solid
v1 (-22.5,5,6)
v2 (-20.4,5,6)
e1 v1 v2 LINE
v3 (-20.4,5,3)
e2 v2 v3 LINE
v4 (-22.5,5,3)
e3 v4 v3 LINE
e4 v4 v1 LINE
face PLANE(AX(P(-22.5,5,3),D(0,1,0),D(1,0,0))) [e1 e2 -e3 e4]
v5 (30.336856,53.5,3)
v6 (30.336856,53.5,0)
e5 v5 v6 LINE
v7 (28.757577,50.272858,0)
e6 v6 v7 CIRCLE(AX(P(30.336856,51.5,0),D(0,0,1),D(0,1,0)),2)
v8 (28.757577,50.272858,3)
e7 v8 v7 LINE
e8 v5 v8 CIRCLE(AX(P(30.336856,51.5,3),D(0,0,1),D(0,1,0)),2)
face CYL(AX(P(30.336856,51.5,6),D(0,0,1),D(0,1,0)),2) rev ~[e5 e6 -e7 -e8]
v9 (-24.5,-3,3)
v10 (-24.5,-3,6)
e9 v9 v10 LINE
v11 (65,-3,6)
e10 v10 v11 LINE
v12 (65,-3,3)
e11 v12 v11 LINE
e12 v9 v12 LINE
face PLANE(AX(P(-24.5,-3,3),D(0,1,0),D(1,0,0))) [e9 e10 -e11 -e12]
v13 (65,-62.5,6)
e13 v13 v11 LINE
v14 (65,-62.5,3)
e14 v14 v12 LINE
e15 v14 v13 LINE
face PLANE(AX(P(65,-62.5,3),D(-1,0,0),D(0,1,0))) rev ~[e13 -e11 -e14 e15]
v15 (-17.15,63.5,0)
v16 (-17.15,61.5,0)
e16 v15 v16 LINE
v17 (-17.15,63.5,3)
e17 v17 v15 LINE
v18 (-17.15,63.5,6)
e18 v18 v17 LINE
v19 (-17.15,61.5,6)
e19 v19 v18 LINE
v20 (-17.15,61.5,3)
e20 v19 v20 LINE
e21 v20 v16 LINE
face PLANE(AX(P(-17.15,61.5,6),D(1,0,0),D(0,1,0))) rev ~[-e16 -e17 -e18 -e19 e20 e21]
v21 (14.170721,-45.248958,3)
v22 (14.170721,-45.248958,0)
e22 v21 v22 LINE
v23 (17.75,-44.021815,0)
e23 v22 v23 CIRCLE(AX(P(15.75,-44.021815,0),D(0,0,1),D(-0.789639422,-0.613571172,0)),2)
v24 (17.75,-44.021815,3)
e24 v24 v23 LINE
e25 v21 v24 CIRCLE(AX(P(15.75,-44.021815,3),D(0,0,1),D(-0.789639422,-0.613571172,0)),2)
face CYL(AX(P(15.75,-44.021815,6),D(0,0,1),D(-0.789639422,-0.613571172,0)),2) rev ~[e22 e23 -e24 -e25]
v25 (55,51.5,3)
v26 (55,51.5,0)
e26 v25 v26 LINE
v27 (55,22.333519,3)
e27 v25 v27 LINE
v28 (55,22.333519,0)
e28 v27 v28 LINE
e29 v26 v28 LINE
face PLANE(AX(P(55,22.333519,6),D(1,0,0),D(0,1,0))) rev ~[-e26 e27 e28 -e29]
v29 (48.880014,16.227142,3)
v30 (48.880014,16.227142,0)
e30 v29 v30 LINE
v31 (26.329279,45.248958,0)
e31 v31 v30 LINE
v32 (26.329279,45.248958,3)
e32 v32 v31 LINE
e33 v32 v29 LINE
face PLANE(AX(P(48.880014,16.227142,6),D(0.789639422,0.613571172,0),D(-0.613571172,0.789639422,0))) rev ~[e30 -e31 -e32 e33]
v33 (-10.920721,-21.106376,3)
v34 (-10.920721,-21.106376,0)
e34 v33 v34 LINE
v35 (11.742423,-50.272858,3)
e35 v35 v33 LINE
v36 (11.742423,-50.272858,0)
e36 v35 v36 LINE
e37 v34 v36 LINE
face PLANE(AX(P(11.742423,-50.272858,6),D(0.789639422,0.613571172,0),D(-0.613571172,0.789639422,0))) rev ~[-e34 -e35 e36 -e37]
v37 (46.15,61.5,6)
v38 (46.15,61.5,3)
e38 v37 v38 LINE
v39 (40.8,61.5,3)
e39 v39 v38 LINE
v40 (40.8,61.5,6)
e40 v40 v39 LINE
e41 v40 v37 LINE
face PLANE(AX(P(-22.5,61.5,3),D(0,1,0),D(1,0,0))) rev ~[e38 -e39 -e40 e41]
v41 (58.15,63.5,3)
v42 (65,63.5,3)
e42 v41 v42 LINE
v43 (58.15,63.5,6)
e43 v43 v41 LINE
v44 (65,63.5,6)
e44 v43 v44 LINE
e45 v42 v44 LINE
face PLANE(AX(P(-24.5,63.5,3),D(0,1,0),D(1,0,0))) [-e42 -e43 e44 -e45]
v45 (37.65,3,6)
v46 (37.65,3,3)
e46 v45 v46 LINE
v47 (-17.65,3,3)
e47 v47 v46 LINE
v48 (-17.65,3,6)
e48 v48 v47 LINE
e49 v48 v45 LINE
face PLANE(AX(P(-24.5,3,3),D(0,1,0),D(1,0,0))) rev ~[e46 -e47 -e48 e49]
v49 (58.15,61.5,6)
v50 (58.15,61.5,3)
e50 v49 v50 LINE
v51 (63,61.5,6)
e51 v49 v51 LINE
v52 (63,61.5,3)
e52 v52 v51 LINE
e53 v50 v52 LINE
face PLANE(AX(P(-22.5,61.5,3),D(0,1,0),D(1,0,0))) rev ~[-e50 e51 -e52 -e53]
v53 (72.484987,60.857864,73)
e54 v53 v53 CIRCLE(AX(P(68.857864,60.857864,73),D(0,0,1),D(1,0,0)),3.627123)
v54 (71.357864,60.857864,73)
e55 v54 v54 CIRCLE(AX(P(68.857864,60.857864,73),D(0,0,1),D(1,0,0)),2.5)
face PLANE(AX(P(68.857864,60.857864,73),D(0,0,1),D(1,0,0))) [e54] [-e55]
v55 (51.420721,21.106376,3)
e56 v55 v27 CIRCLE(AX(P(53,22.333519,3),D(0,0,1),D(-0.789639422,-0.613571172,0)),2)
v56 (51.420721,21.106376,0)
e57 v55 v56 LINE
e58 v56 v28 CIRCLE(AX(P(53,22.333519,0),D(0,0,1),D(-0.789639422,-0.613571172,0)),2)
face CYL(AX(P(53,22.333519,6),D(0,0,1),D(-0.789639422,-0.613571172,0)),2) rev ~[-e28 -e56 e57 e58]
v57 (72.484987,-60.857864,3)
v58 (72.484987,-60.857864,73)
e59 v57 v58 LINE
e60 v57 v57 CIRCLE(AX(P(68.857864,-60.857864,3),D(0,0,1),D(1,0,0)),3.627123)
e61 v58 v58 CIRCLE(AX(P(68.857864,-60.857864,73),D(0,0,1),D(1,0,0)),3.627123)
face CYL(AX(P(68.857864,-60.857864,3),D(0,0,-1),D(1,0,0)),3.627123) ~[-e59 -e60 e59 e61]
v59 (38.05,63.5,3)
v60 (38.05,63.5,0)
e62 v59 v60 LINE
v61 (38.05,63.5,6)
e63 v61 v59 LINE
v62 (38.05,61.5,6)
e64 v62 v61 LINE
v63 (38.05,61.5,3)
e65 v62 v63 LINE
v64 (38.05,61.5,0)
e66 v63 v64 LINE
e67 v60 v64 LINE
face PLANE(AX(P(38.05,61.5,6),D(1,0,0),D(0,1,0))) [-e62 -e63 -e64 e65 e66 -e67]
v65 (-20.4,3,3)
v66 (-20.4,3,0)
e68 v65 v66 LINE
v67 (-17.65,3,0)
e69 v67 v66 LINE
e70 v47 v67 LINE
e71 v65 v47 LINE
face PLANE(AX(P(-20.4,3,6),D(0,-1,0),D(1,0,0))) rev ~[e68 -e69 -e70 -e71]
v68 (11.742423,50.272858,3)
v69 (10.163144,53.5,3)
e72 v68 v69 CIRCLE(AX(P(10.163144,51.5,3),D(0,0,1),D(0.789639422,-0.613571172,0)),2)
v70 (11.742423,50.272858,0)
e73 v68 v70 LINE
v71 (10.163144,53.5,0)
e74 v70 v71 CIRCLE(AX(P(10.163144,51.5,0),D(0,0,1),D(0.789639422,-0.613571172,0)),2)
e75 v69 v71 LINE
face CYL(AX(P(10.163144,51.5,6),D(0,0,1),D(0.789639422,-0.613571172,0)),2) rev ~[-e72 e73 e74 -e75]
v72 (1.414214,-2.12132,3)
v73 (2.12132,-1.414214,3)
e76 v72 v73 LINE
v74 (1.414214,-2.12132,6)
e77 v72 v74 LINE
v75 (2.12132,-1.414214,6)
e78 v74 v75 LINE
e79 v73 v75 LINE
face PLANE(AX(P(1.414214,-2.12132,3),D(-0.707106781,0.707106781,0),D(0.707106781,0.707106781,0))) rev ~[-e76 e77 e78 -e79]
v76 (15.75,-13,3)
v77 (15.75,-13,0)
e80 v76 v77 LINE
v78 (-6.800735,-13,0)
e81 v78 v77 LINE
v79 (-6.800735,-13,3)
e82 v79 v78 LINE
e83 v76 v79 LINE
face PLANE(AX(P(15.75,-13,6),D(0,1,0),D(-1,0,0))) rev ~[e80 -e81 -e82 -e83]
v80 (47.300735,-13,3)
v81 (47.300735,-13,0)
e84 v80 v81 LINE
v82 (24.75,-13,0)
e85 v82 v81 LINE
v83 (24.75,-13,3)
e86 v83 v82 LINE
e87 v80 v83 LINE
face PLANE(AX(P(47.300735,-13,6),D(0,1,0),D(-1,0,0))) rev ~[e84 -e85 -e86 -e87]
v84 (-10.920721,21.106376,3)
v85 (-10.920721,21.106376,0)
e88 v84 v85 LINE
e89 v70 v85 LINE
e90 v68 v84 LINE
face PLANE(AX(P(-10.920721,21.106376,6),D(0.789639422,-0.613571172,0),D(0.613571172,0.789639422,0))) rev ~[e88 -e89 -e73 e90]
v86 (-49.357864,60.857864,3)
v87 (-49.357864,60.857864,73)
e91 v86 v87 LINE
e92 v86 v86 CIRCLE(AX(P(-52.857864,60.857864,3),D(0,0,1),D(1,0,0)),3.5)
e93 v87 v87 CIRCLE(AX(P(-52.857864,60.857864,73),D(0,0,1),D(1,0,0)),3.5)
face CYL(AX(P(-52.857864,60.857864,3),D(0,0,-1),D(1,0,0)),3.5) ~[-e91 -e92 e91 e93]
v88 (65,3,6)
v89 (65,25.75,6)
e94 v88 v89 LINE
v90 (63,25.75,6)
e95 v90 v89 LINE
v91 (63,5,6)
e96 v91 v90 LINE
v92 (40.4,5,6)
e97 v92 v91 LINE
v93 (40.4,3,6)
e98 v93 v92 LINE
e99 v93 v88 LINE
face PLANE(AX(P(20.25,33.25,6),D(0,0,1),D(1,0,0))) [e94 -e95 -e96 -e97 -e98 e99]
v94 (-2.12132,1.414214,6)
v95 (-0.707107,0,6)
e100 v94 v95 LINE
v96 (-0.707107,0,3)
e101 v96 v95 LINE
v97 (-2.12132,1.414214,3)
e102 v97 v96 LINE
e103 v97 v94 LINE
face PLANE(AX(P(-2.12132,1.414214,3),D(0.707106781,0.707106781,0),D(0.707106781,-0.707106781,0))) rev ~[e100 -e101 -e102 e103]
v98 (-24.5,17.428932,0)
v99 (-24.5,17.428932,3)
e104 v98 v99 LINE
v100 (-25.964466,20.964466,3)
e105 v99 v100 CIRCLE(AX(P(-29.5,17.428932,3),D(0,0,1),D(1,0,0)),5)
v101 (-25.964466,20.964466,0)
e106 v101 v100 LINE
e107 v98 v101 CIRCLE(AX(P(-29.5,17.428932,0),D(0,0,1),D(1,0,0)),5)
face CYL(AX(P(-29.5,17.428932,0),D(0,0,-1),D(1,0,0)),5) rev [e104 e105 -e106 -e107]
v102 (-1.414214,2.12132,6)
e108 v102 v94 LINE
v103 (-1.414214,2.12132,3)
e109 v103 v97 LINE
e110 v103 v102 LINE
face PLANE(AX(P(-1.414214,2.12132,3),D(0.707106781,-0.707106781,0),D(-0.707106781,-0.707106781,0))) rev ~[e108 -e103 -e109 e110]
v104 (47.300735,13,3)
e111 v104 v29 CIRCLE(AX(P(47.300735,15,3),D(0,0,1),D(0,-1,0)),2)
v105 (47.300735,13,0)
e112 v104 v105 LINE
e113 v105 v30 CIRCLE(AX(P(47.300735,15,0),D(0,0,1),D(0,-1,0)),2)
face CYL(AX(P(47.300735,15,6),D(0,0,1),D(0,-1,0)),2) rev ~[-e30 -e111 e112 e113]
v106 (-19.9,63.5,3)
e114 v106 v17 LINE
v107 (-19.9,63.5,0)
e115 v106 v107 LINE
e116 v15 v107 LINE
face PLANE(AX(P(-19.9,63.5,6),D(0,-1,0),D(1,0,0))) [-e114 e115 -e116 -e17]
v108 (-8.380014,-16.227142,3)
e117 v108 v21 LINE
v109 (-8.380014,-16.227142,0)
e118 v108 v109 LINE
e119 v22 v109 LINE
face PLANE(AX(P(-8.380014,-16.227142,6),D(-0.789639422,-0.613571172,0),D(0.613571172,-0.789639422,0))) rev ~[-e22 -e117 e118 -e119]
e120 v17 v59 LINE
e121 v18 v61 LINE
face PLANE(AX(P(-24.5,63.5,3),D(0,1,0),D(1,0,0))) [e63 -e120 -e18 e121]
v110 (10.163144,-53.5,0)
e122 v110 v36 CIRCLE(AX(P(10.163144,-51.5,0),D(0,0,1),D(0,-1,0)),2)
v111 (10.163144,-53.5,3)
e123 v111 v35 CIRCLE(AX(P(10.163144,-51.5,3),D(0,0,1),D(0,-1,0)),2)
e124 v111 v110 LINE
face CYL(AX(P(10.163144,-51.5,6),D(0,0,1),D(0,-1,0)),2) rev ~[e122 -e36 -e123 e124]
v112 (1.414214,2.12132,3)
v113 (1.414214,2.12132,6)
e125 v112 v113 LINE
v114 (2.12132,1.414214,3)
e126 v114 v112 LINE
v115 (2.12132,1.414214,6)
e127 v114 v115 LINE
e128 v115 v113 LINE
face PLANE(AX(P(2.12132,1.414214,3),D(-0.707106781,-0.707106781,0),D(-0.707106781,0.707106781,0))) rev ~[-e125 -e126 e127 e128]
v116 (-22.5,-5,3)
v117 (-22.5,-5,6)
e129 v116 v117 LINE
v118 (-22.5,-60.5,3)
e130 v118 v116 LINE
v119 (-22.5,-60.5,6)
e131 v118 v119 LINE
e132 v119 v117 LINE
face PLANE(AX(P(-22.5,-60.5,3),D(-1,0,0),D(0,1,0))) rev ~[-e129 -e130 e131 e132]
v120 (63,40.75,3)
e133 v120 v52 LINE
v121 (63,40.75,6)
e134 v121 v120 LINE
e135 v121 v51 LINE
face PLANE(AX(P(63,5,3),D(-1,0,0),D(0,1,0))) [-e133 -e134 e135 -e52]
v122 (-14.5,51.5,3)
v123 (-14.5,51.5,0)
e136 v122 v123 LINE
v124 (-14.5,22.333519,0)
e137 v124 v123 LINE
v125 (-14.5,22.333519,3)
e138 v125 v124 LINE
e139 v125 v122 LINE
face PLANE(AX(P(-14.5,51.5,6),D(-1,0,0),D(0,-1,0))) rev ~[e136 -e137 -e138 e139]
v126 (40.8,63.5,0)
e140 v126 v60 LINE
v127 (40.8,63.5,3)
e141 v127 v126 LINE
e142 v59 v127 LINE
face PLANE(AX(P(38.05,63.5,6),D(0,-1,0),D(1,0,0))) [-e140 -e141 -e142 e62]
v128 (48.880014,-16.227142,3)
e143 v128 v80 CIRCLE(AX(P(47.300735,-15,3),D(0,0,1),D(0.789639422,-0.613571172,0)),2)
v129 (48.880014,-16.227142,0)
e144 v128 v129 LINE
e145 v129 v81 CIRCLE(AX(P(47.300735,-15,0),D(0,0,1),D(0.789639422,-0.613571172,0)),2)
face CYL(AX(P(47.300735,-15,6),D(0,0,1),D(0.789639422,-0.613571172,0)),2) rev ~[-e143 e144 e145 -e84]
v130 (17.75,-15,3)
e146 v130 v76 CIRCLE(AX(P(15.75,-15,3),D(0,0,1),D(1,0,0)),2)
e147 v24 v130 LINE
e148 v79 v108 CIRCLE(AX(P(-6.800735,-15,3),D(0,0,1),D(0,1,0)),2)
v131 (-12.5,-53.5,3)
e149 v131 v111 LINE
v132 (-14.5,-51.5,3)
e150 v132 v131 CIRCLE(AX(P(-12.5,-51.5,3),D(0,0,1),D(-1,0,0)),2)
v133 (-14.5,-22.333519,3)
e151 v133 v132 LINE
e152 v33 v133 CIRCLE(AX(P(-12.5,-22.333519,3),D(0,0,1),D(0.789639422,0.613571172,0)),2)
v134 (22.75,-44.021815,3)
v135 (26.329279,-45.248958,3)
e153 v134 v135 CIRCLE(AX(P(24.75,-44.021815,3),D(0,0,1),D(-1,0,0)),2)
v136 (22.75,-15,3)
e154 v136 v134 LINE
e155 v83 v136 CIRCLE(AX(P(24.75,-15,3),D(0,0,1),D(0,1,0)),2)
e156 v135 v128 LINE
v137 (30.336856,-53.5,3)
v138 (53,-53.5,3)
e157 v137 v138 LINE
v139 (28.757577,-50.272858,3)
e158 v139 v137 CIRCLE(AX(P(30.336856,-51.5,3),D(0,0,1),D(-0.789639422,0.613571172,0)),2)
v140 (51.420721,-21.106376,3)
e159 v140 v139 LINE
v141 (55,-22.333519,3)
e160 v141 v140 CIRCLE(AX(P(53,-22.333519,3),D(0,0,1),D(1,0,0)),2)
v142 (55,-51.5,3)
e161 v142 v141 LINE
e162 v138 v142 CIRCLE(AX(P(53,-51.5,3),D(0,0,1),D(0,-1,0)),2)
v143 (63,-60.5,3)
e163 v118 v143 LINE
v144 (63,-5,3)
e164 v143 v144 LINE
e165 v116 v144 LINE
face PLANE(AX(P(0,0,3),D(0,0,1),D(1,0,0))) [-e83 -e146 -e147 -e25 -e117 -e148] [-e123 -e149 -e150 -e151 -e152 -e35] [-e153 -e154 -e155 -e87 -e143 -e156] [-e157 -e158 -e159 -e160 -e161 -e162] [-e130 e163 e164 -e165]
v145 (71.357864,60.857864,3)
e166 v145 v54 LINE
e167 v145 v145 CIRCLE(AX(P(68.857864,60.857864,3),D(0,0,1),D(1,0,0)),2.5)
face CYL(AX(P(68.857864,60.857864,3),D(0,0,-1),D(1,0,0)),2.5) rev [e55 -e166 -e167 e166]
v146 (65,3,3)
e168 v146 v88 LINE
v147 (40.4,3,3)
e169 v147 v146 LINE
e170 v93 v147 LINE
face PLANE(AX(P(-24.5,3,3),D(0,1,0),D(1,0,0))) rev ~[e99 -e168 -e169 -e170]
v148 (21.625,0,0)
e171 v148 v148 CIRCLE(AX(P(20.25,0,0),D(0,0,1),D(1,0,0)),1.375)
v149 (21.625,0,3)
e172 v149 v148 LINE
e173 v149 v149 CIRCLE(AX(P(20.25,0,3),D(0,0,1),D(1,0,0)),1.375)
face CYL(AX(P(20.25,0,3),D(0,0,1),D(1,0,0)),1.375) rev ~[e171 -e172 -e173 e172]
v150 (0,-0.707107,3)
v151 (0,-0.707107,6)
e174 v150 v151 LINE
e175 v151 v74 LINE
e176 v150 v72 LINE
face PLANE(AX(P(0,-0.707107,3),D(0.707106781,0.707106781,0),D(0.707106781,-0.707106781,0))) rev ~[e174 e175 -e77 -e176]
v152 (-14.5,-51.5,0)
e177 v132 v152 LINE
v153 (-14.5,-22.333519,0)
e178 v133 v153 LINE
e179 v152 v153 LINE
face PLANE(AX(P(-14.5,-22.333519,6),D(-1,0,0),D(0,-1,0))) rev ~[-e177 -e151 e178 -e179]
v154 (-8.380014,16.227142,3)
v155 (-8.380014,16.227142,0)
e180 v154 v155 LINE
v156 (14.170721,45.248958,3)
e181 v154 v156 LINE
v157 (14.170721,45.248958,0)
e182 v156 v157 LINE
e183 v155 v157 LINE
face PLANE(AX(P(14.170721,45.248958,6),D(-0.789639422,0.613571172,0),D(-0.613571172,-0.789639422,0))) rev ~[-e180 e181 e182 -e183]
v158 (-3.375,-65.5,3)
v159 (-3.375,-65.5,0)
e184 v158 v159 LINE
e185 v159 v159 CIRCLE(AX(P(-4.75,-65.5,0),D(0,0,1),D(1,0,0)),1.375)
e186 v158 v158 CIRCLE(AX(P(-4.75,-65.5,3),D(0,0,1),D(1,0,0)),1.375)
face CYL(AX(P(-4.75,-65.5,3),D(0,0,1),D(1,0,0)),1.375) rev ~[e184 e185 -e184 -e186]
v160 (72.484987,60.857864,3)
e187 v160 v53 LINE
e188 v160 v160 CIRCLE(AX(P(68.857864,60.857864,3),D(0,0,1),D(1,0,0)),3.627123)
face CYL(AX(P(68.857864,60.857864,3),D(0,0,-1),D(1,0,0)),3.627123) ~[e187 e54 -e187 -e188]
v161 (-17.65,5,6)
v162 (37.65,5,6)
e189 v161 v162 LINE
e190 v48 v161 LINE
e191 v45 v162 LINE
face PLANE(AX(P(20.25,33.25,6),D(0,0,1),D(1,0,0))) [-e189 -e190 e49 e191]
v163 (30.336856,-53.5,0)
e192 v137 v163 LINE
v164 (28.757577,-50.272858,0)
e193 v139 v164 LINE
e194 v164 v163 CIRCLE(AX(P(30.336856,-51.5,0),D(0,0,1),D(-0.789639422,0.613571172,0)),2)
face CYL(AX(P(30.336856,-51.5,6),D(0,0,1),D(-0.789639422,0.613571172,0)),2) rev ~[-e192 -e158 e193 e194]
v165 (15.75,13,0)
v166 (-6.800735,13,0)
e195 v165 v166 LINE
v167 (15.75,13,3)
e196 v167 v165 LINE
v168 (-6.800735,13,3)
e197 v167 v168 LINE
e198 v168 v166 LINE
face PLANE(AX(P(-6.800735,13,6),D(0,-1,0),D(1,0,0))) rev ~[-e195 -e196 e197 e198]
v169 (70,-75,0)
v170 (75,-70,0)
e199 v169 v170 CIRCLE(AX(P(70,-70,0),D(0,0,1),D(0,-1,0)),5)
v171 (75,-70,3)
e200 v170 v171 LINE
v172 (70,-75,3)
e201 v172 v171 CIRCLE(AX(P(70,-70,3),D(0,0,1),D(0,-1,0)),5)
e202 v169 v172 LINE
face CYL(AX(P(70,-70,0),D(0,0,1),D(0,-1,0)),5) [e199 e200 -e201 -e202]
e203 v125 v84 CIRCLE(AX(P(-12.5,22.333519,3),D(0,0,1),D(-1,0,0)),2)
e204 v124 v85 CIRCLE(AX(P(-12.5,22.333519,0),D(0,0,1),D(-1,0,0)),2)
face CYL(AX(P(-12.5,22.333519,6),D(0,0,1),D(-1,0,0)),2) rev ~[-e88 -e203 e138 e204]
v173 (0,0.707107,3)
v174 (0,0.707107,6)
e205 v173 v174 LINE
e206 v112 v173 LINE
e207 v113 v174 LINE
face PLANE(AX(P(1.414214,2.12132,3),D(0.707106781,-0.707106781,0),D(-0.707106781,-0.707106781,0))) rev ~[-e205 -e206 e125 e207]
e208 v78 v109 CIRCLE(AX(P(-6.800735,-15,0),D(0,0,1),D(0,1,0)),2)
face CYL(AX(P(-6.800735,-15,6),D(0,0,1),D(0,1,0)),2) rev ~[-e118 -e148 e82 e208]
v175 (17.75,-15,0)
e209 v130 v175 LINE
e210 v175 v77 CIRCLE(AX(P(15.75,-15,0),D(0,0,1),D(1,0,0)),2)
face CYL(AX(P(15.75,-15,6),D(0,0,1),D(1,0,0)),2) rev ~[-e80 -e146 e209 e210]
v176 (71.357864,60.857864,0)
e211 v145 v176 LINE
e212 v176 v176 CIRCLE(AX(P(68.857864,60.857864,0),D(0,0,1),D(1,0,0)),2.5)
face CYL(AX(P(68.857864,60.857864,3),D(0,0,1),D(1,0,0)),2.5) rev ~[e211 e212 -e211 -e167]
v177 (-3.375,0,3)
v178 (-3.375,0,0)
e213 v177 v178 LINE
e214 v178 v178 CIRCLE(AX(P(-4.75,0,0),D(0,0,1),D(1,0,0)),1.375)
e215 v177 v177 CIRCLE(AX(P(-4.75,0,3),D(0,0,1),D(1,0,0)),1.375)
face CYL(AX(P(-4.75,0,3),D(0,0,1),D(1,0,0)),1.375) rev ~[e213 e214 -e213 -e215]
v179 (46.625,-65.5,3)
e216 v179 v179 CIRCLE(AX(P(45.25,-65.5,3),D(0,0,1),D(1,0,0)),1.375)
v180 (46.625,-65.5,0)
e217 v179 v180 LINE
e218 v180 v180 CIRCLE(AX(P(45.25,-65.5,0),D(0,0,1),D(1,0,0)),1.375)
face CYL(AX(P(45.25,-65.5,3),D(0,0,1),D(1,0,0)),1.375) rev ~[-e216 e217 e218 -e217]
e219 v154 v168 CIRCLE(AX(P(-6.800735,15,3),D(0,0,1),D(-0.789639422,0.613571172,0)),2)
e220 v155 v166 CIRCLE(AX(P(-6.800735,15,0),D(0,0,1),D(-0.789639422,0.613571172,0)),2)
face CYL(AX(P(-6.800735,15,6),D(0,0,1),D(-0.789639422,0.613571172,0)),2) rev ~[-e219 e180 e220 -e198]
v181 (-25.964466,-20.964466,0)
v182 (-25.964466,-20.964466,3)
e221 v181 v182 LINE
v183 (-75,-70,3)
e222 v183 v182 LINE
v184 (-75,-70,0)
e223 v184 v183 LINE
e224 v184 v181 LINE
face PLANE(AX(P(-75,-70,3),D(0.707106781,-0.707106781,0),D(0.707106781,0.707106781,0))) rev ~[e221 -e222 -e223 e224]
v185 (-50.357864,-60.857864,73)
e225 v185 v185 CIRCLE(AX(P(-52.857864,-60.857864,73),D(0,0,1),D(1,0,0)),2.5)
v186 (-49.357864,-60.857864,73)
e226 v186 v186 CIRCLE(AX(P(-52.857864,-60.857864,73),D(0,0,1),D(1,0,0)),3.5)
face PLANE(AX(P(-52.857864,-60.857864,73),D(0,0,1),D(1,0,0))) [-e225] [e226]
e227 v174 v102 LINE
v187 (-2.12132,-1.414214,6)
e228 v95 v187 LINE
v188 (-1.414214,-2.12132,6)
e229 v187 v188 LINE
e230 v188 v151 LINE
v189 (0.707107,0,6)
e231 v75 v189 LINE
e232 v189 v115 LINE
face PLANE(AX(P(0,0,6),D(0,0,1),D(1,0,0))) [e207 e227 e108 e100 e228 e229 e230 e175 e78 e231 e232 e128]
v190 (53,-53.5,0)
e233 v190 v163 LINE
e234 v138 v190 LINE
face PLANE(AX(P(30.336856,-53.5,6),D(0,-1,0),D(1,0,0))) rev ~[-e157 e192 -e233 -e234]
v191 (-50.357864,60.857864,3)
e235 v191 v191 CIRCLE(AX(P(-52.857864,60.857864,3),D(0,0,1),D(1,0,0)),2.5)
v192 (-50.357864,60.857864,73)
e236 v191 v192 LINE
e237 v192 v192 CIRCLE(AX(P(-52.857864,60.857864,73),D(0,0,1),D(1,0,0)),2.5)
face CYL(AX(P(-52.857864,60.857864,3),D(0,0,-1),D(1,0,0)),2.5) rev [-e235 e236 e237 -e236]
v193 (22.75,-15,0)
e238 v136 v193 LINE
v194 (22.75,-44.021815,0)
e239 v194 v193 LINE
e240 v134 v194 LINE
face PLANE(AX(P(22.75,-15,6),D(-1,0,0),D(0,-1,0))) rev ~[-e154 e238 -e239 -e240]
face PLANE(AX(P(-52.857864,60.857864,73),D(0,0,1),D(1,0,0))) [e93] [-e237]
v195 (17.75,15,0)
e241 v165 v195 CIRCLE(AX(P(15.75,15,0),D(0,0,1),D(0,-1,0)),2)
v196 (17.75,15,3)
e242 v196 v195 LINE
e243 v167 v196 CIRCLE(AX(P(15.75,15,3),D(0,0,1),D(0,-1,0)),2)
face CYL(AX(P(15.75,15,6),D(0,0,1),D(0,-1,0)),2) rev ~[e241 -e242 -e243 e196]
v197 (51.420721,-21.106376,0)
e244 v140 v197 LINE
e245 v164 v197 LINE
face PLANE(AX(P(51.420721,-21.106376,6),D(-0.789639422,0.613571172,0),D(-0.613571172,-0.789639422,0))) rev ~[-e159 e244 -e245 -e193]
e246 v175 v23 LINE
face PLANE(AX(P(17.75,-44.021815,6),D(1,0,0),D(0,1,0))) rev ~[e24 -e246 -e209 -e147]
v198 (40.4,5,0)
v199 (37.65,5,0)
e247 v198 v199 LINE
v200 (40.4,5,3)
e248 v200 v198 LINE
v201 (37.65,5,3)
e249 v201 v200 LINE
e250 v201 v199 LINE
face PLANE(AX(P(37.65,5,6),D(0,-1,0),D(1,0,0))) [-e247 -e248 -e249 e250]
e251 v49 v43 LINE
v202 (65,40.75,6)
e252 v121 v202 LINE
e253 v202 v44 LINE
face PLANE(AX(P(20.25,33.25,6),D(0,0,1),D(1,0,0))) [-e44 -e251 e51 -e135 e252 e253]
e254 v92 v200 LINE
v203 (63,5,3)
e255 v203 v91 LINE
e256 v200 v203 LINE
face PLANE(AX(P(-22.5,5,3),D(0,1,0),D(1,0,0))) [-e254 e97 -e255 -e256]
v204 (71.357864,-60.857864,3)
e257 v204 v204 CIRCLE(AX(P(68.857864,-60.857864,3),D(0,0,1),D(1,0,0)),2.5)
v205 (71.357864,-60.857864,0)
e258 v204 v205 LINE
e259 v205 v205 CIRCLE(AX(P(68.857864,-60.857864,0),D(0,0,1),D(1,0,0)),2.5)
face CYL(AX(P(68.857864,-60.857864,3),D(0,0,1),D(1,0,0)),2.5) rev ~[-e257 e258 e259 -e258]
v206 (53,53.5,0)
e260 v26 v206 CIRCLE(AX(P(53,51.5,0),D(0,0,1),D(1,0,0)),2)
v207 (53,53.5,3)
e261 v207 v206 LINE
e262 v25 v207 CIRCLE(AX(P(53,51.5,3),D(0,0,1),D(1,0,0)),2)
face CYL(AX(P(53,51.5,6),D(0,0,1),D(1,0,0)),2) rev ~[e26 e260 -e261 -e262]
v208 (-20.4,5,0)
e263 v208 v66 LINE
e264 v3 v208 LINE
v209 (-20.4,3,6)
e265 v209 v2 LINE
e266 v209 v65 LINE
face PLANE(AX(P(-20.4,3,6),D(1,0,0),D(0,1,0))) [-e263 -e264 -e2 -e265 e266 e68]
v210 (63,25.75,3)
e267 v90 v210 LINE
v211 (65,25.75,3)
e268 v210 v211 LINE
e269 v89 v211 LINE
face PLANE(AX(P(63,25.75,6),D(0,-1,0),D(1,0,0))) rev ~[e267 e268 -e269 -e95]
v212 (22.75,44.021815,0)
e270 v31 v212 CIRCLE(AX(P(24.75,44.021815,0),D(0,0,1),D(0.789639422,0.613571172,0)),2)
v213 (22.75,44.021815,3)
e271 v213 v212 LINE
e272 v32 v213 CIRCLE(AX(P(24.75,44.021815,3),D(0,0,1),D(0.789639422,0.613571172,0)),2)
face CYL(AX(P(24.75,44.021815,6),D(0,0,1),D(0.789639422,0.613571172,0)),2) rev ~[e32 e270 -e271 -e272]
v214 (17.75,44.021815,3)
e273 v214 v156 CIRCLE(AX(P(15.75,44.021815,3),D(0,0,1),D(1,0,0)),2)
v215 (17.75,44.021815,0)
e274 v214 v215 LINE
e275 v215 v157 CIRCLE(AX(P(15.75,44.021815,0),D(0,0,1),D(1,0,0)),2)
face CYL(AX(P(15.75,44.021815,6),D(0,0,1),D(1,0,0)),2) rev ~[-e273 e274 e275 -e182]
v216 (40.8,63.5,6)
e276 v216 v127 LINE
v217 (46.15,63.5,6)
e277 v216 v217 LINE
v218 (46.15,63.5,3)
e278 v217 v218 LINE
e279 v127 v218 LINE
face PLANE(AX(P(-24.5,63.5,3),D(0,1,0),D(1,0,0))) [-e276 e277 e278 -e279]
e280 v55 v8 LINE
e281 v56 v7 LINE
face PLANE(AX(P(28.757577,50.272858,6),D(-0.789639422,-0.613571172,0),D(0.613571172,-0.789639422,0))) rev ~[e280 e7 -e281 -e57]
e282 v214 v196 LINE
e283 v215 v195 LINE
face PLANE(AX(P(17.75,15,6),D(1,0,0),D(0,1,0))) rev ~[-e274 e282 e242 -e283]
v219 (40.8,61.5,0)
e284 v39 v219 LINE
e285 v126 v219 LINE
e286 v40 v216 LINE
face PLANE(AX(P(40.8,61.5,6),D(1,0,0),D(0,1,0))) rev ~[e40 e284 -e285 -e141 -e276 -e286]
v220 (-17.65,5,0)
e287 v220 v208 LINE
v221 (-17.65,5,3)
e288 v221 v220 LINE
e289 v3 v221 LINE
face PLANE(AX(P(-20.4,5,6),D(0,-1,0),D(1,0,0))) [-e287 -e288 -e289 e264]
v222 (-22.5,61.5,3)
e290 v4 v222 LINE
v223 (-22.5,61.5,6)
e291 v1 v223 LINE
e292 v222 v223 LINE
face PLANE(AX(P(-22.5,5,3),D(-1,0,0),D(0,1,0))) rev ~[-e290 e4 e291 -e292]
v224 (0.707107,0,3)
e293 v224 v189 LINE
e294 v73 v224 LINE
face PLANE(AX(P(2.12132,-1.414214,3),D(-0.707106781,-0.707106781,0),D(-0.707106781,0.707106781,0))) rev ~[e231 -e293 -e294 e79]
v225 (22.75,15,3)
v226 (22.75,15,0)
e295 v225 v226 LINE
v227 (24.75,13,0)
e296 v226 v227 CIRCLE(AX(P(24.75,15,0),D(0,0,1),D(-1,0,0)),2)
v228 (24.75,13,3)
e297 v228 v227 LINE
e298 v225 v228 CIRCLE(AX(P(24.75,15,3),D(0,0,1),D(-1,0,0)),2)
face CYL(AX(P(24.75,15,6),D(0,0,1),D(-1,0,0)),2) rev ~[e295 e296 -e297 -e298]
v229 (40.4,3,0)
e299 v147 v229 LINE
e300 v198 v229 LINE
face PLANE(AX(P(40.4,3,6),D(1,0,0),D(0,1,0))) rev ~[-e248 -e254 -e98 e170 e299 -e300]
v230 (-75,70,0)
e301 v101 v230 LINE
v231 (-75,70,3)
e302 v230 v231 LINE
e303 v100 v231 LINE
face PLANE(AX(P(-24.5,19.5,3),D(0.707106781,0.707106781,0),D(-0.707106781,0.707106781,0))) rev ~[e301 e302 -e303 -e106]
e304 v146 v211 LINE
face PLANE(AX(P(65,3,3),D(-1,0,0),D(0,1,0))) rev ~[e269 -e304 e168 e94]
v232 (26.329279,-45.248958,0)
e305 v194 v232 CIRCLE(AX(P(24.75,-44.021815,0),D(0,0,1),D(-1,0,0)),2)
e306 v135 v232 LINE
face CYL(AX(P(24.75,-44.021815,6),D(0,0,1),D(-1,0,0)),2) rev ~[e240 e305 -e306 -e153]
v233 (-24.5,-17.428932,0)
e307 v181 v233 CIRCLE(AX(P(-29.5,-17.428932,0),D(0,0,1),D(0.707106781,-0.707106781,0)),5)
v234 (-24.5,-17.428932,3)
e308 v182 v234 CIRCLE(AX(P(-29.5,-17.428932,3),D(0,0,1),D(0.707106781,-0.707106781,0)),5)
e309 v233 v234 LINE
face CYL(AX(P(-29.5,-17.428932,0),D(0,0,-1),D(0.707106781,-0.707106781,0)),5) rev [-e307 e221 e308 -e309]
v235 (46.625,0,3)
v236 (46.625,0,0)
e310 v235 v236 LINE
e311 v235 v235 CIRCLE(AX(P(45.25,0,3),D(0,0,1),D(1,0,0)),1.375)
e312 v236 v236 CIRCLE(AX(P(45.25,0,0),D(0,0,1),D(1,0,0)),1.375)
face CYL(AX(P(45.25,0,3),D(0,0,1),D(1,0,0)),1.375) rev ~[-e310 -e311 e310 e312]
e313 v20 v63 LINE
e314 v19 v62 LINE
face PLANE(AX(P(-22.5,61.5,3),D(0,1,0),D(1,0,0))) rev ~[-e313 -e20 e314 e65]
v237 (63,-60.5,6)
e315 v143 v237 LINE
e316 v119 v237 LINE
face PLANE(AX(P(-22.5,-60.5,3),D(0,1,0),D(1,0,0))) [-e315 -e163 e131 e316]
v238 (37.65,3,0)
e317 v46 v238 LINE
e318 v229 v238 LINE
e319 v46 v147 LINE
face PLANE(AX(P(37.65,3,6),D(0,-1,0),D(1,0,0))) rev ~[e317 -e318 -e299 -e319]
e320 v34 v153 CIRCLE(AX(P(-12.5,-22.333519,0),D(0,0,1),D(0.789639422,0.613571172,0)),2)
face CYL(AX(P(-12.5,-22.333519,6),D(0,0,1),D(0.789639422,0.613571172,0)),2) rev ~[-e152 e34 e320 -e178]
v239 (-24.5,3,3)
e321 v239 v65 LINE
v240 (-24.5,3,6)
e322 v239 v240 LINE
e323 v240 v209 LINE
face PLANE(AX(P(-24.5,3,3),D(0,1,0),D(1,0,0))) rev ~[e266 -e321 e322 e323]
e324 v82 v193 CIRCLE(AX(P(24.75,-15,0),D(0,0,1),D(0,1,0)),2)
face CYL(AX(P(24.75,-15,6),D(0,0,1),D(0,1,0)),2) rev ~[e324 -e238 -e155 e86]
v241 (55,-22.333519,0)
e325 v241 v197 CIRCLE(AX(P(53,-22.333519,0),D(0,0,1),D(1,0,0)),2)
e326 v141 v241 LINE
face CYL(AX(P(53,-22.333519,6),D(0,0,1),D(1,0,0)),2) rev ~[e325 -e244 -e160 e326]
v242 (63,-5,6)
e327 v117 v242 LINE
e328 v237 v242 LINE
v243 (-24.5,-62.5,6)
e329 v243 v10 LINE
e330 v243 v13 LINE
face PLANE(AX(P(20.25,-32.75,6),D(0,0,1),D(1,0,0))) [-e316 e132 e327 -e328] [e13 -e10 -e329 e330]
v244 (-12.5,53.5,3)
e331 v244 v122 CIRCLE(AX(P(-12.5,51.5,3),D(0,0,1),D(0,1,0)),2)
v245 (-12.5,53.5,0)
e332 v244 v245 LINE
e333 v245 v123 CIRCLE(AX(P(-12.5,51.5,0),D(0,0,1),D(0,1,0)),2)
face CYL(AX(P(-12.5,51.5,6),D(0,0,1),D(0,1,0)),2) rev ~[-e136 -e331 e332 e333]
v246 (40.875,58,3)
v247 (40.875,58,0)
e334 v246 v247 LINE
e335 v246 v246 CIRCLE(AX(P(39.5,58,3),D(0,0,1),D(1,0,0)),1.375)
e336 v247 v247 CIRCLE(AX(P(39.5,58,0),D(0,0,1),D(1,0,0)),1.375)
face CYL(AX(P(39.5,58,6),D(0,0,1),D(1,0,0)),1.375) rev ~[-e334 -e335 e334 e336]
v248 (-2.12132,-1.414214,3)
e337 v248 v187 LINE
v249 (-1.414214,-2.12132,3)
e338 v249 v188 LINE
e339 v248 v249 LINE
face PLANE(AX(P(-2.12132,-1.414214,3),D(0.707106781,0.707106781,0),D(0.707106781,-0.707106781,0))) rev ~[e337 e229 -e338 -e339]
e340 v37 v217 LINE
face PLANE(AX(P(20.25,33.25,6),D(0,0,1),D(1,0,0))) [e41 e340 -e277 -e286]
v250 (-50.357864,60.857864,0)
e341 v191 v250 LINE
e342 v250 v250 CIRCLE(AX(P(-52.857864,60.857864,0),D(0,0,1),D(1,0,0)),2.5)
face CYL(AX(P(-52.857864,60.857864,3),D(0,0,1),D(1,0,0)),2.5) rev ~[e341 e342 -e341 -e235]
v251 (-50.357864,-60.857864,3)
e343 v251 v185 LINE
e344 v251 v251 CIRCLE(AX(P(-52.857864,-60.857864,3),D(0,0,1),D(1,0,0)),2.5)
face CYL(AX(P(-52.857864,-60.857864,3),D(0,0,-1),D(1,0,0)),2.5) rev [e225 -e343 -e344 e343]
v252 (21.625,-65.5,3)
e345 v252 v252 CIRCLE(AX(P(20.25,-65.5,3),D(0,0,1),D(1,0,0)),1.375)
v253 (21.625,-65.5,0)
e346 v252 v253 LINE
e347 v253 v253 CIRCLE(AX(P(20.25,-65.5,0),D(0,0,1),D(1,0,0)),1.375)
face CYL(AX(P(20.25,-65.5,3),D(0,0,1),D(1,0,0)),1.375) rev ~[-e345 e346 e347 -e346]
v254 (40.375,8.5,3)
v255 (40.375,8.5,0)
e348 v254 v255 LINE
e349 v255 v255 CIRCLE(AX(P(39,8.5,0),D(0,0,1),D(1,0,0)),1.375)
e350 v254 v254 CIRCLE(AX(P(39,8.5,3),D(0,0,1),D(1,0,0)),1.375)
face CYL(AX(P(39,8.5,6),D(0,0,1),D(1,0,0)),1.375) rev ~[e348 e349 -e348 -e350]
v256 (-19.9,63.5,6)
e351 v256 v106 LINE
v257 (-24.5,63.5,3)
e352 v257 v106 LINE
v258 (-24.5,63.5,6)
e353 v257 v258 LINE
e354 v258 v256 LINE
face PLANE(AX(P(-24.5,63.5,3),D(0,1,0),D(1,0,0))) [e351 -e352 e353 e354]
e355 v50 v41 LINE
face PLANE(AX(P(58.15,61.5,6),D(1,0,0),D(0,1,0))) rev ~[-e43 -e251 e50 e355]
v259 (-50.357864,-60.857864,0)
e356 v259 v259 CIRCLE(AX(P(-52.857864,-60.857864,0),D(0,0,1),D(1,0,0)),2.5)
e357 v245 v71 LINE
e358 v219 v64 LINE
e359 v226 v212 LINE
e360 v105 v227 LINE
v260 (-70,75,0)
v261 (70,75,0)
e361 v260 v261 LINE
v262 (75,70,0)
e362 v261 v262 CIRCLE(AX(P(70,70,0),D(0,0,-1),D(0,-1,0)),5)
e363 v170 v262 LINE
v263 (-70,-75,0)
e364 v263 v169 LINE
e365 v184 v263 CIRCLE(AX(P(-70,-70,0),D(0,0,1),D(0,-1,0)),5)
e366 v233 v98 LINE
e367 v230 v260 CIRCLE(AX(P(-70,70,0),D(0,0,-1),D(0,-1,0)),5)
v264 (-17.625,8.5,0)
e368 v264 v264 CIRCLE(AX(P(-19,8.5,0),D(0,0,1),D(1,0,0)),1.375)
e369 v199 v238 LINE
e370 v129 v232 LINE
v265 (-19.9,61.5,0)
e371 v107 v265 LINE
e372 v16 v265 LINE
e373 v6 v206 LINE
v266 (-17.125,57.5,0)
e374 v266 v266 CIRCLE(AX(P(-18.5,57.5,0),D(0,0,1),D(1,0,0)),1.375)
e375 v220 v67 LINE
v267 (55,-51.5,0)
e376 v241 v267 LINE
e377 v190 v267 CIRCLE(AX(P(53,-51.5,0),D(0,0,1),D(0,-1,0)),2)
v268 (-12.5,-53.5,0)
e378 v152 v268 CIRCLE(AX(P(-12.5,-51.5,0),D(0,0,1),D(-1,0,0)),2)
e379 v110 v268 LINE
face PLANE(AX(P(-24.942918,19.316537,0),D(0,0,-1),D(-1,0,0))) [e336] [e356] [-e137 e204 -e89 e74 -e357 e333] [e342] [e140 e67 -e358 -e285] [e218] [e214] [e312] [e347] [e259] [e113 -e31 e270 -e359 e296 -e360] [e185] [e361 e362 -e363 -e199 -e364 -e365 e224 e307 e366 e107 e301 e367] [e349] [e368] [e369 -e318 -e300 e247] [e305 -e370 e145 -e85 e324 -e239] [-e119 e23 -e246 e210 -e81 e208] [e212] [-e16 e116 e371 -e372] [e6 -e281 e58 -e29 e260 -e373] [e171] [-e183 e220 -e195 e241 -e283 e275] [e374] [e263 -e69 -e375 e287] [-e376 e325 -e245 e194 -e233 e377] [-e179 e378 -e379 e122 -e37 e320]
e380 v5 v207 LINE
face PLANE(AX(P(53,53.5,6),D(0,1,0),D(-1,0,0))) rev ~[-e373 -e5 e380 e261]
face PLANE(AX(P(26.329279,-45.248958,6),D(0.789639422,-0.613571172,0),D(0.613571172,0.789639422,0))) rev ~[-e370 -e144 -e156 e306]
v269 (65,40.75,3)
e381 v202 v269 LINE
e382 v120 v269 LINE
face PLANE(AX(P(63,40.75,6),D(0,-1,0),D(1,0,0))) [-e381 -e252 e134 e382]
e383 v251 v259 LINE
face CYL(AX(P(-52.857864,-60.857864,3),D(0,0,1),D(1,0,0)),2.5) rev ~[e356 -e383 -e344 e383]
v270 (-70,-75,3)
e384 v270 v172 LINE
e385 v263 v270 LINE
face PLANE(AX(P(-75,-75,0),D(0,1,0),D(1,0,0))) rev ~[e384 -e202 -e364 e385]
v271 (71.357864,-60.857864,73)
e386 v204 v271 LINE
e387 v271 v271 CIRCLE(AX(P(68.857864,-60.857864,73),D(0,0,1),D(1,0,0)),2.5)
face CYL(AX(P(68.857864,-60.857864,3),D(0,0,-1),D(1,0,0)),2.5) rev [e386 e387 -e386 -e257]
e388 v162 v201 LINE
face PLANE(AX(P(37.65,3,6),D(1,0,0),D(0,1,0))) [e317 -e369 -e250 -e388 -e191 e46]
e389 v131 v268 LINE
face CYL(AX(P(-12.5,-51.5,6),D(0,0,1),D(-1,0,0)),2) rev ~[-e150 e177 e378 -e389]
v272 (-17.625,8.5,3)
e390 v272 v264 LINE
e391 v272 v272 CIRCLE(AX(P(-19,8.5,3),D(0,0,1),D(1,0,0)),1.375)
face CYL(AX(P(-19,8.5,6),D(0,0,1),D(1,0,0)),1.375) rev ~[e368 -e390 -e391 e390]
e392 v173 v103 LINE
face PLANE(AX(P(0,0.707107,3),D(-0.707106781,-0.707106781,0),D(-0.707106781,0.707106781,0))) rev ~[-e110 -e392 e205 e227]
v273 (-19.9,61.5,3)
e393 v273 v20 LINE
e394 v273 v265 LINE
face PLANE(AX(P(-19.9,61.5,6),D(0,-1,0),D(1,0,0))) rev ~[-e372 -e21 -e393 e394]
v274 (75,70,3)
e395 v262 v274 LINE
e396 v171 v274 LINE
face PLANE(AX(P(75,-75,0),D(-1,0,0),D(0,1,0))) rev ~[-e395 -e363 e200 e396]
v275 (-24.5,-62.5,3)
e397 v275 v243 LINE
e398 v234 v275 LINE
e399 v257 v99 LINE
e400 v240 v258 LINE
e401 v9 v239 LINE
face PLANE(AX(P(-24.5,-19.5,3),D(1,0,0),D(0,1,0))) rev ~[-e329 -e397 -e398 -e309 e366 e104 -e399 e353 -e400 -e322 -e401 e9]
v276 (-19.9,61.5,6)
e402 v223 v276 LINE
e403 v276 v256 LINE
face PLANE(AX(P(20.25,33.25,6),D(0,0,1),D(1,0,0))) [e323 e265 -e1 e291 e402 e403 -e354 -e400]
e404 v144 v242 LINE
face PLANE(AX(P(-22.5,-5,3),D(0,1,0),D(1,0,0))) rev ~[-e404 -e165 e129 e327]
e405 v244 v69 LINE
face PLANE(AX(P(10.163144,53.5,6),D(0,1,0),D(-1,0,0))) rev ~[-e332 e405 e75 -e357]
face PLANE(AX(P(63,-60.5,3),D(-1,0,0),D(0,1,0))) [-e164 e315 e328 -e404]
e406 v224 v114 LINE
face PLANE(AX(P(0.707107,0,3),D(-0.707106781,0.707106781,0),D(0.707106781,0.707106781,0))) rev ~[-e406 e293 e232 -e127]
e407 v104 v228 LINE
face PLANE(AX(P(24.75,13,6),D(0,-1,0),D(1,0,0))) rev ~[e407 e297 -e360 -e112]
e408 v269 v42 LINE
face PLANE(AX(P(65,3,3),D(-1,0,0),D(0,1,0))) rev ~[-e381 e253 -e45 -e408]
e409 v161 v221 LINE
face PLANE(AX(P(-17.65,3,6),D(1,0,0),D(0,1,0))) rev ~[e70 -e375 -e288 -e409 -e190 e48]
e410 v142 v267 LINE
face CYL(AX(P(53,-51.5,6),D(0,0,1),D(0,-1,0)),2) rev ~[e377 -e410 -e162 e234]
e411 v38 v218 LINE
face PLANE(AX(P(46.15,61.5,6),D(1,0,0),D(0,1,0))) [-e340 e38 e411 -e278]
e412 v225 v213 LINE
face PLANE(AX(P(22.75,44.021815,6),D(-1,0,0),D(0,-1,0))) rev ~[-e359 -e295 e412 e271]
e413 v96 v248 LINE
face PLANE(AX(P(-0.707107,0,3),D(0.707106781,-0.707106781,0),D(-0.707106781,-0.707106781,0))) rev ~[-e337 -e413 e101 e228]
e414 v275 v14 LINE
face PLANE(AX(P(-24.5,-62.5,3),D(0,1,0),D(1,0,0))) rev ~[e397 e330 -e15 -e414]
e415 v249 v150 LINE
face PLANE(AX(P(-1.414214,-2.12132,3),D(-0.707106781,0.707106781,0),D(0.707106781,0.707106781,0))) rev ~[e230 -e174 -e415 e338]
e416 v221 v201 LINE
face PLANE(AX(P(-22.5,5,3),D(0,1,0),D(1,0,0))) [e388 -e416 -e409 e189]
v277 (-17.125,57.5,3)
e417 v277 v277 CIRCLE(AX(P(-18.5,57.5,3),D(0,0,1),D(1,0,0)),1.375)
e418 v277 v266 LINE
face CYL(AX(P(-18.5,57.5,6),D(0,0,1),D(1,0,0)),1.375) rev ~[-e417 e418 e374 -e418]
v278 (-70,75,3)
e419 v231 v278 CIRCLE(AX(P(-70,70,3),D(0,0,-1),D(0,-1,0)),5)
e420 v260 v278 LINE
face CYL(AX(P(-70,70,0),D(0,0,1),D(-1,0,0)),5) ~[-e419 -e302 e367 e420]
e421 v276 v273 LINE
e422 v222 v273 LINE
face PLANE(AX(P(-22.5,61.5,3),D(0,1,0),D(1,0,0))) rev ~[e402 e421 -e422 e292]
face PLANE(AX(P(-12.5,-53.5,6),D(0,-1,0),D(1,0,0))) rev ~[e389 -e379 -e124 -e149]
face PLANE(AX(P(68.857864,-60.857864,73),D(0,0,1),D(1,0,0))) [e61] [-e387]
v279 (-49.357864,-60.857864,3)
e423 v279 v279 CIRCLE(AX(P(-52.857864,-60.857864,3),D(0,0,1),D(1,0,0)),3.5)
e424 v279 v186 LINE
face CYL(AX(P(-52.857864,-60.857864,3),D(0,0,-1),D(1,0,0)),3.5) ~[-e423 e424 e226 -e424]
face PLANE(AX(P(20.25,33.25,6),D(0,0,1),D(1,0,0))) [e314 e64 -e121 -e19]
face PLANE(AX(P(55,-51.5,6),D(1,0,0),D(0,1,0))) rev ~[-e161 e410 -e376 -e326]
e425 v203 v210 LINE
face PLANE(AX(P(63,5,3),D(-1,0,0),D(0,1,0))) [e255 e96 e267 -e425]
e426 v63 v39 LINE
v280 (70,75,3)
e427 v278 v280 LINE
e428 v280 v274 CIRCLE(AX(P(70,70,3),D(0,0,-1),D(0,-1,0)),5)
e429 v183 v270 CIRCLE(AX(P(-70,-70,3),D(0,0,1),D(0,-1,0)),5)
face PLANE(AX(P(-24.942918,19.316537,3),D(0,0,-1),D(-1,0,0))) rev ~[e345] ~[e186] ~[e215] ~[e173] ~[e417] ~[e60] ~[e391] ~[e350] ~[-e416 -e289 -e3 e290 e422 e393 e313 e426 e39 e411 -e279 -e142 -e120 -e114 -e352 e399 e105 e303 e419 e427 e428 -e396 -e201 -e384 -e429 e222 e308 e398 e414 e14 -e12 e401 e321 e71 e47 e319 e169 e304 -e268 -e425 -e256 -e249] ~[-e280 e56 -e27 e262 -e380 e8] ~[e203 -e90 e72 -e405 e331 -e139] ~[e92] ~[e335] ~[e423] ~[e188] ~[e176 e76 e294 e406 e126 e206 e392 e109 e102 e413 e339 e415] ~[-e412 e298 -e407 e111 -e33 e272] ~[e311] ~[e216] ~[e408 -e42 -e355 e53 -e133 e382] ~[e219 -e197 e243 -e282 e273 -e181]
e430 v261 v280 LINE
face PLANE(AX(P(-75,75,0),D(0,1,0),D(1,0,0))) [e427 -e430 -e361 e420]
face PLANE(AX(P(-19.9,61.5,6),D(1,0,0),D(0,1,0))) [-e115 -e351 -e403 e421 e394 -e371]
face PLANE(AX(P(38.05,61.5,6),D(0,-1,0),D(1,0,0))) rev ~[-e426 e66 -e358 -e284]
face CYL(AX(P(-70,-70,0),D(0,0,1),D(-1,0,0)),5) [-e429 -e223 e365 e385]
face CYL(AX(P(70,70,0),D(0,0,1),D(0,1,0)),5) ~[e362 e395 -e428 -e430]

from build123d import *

# Parameters (mm, degrees)
F0_W         = 150
F0_H         = 150
F1_DEPTH     = 3
F2_W         = 89.5
F2_H         = 60.5
F2_W_2       = 85.5
F2_H_2       = 56.5
F3_DEPTH     = 3
F4_W         = 12
F4_H         = 2
F4_W_2       = 2
F4_H_2       = 15
F5_DEPTH     = 3
F6_R         = 5
F7_W         = 89.5
F7_H         = 59.5
F7_W_2       = 85.5
F7_H_2       = 55.5
F8_DEPTH     = 3
F9_R         = 3.6271227465
F9_R_2       = 2.5
F9_R_3       = 3.5
F10_DEPTH    = 70
F12_DEPTH    = 3
F13_R        = 2.5
F13_R_2      = 28.6222607242
F13_R_3      = 34.4815327899
F13_R_4      = 36.1444775831
F14_DEPTH    = 25
F16_DEPTH    = 25
F17_T1_DEPTH = 3
F18_R        = 1.375
F19_DEPTH    = 25
F20_W        = 2.75
F20_H        = 2
F21_DEPTH    = 25
F23_R        = 1.375
F24_DEPTH    = 25
F26_DEPTH    = 25


# Not quite as in the source:
# - a fillet or chamfer that OpenCascade refuses, or shapes differently, is made with other operations: its cross-section is extruded or revolved along the edge and cut away or added


with BuildPart() as f1:
    # F0 (on Top) → F1 (new body)
    with BuildSketch(Plane.XY):
        Rectangle(F0_W, F0_H)
    extrude(amount=F1_DEPTH)

    # F2 (on face) → F3 (join)
    with BuildSketch(Plane.XY.offset(3)):
        with Locations((20.25, 33.25)):
            Rectangle(F2_W, F2_H)
        with Locations((20.25, 33.25)):
            Rectangle(F2_W_2, F2_H_2, mode=Mode.SUBTRACT)
    extrude(amount=F3_DEPTH)

    # F4 (on face) → F5 (cut)
    with BuildSketch(Plane.XY.offset(6)):
        with Locations((52.15, 62.5)):
            Rectangle(F4_W, F4_H)
        with Locations((64, 33.25)):
            Rectangle(F4_W_2, F4_H_2)
    extrude(amount=-F5_DEPTH, mode=Mode.SUBTRACT)

    # F6
    f6_edges = [f1.edges().sort_by_distance(p)[0] for p in [
        (-75, 75, 1.5),
        (75, 75, 1.5),
        (75, -75, 1.5),
        (-75, -75, 1.5),
    ]]
    fillet(f6_edges, radius=F6_R)

    # F7 (on face) → F8 (join)
    with BuildSketch(Plane.XY.offset(3)):
        with Locations((20.25, -32.75)):
            Rectangle(F7_W, F7_H)
        with Locations((20.25, -32.75)):
            Rectangle(F7_W_2, F7_H_2, mode=Mode.SUBTRACT)
    extrude(amount=F8_DEPTH)

    # F9 (on face) → F10 (join)
    with BuildSketch(Plane.XY.offset(3)):
        with Locations((68.8578643763, 60.8578643763)):
            Circle(F9_R)
        with Locations((68.8578643763, 60.8578643763)):
            Circle(F9_R_2, mode=Mode.SUBTRACT)
        with Locations((68.8578643763, -60.8578643763)):
            Circle(F9_R)
        with Locations((68.8578643763, -60.8578643763)):
            Circle(F9_R_2, mode=Mode.SUBTRACT)
        with Locations((-52.8578643763, 60.8578643763)):
            Circle(F9_R_3)
        with Locations((-52.8578643763, 60.8578643763)):
            Circle(F9_R_2, mode=Mode.SUBTRACT)
        with Locations((-52.8578643763, -60.8578643763)):
            Circle(F9_R_3)
        with Locations((-52.8578643763, -60.8578643763)):
            Circle(F9_R_2, mode=Mode.SUBTRACT)
    extrude(amount=F10_DEPTH)

    # F11 (on face) → F12 (join)
    with BuildSketch(Plane.XY.offset(3)):
        Polygon((-1.4142135624, 2.1213203436), (-2.1213203436, 1.4142135624), (-0.7071067812, 0), (-2.1213203436, -1.4142135624), (-1.4142135624, -2.1213203436), (0, -0.7071067812), (1.4142135624, -2.1213203436), (2.1213203436, -1.4142135624), (0.7071067812, 0), (2.1213203436, 1.4142135624), (1.4142135624, 2.1213203436), (0, 0.7071067812), align=None)
    extrude(amount=F12_DEPTH)

    # F13 (on face) → F14 (cut)
    with BuildSketch(Plane.XY.offset(3)):
        with Locations((-52.8578643763, 60.8578643763)):
            Circle(F13_R)
        with Locations((662.2217056946, 102.264947845)):
            Circle(F13_R_2)
        with Locations((693.5295645663, -597.344861617)):
            Circle(F13_R_3)
        with Locations((-44.6129470708, -626.2444101651)):
            Circle(F13_R_4)
        with Locations((68.8578643763, 60.8578643763)):
            Circle(F13_R)
        with Locations((68.8578643763, -60.8578643763)):
            Circle(F13_R)
        with Locations((-52.8578643763, -60.8578643763)):
            Circle(F13_R)
    extrude(amount=-F14_DEPTH, mode=Mode.SUBTRACT)

    # F15 (on face) → F16 (cut)
    with BuildSketch(Plane.XY.offset(3)):
        Polygon((-24.5, 19.5), (-75, 70), (-75, -70), (-24.5, -19.5), align=None)
    extrude(amount=-F16_DEPTH, mode=Mode.SUBTRACT)

    # F17: fillet of radius 5 on 4 edges, made by hand

    # F17_s2 → F17_t1 (join)
    with BuildSketch(Plane.XY):
        with BuildLine():
            ThreePointArc((-24.5, 17.4289321881), (-24.8806023374, 19.34234935), (-25.9644660941, 20.9644660941))
            Line((-25.9644660941, 20.9644660941), (-24.5, 19.5))
            Line((-24.5, 19.5), (-24.5, 17.4289321881))
        make_face()
        with BuildLine():
            ThreePointArc((-25.9644660941, -20.9644660941), (-24.8806023374, -19.34234935), (-24.5, -17.4289321881))
            Line((-24.5, -17.4289321881), (-24.5, -19.5))
            Line((-24.5, -19.5), (-25.9644660941, -20.9644660941))
        make_face()
    extrude(amount=F17_T1_DEPTH)

    # F18 (on face) → F19 (cut)
    with BuildSketch(Plane.XY.offset(6)):
        with Locations((-18.5, 57.5)):
            Circle(F18_R)
        with Locations((39.5, 58)):
            Circle(F18_R)
        with Locations((-19, 8.5)):
            Circle(F18_R)
        with Locations((39, 8.5)):
            Circle(F18_R)
    extrude(amount=-F19_DEPTH, mode=Mode.SUBTRACT)

    # F20 (on face) → F21 (cut)
    with BuildSketch(Plane.XY.offset(6)):
        with Locations((-18.525, 62.5)):
            Rectangle(F20_W, F20_H)
        with Locations((39.425, 62.5)):
            Rectangle(F20_W, F20_H)
        with Locations((39.025, 4)):
            Rectangle(F20_W, F20_H)
        with Locations((-19.025, 4)):
            Rectangle(F20_W, F20_H)
    extrude(amount=-F21_DEPTH, mode=Mode.SUBTRACT)

    # F23 (on face) → F24 (cut)
    with BuildSketch(Plane.XY.offset(3)):
        with Locations((-4.75, 0)):
            Circle(F23_R)
        with Locations((20.25, 0)):
            Circle(F23_R)
        with Locations((45.25, 0)):
            Circle(F23_R)
        with Locations((45.25, -65.5)):
            Circle(F23_R)
        with Locations((20.25, -65.5)):
            Circle(F23_R)
        with Locations((-4.75, -65.5)):
            Circle(F23_R)
    extrude(amount=-F24_DEPTH, mode=Mode.SUBTRACT)

    # F25 (on face) → F26 (cut)
    with BuildSketch(Plane.XY.offset(6)):
        with BuildLine():
            Line((48.8800137441, 16.2271423447), (26.3292788436, 45.2489576949))
            ThreePointArc((26.3292788436, 45.2489576949), (24.1013697846, 45.9137135619), (22.75, 44.0218153502))
            Line((22.75, 44.0218153502), (22.75, 15))
            ThreePointArc((22.75, 15), (23.3357864376, 13.5857864376), (24.75, 13))
            Line((24.75, 13), (47.3007349005, 13))
            ThreePointArc((47.3007349005, 13), (49.0971597792, 14.120876769), (48.8800137441, 16.2271423447))
        make_face()
        with BuildLine():
            Line((28.7575768219, 50.2728576553), (51.4207211564, 21.1063762509))
            ThreePointArc((51.4207211564, 21.1063762509), (53.6486302154, 20.4416203838), (55, 22.3335185956))
            Line((55, 22.3335185956), (55, 51.5))
            ThreePointArc((55, 51.5), (54.4142135624, 52.9142135624), (53, 53.5))
            Line((53, 53.5), (30.3368556655, 53.5))
            ThreePointArc((30.3368556655, 53.5), (28.5404307868, 52.379123231), (28.7575768219, 50.2728576553))
        make_face()
        with BuildLine():
            ThreePointArc((-12.5, 53.5), (-13.9142135624, 52.9142135624), (-14.5, 51.5))
            Line((-14.5, 51.5), (-14.5, 22.3335185956))
            ThreePointArc((-14.5, 22.3335185956), (-13.1486302154, 20.4416203838), (-10.9207211564, 21.1063762509))
            Line((-10.9207211564, 21.1063762509), (11.7424231781, 50.2728576553))
            ThreePointArc((11.7424231781, 50.2728576553), (11.9595692132, 52.379123231), (10.1631443345, 53.5))
            Line((10.1631443345, 53.5), (-12.5, 53.5))
        make_face()
        with BuildLine():
            Line((17.75, 15), (17.75, 44.0218153502))
            ThreePointArc((17.75, 44.0218153502), (16.3986302154, 45.9137135619), (14.1707211564, 45.2489576949))
            Line((14.1707211564, 45.2489576949), (-8.3800137441, 16.2271423447))
            ThreePointArc((-8.3800137441, 16.2271423447), (-8.5971597792, 14.120876769), (-6.8007349005, 13))
            Line((-6.8007349005, 13), (15.75, 13))
            ThreePointArc((15.75, 13), (17.1642135624, 13.5857864376), (17.75, 15))
        make_face()
        with BuildLine():
            Line((-14.5, -22.3335185956), (-14.5, -51.5))
            ThreePointArc((-14.5, -51.5), (-13.9142135624, -52.9142135624), (-12.5, -53.5))
            Line((-12.5, -53.5), (10.1631443345, -53.5))
            ThreePointArc((10.1631443345, -53.5), (11.9595692132, -52.379123231), (11.7424231781, -50.2728576553))
            Line((11.7424231781, -50.2728576553), (-10.9207211564, -21.1063762509))
            ThreePointArc((-10.9207211564, -21.1063762509), (-13.1486302154, -20.4416203838), (-14.5, -22.3335185956))
        make_face()
        with BuildLine():
            ThreePointArc((24.75, -13), (23.3357864376, -13.5857864376), (22.75, -15))
            Line((22.75, -15), (22.75, -44.0218153502))
            ThreePointArc((22.75, -44.0218153502), (24.1013697846, -45.9137135619), (26.3292788436, -45.2489576949))
            Line((26.3292788436, -45.2489576949), (48.8800137441, -16.2271423447))
            ThreePointArc((48.8800137441, -16.2271423447), (49.0971597792, -14.120876769), (47.3007349005, -13))
            Line((47.3007349005, -13), (24.75, -13))
        make_face()
        with BuildLine():
            ThreePointArc((53, -53.5), (54.4142135624, -52.9142135624), (55, -51.5))
            Line((55, -51.5), (55, -22.3335185956))
            ThreePointArc((55, -22.3335185956), (53.6486302154, -20.4416203838), (51.4207211564, -21.1063762509))
            Line((51.4207211564, -21.1063762509), (28.7575768219, -50.2728576553))
            ThreePointArc((28.7575768219, -50.2728576553), (28.5404307868, -52.379123231), (30.3368556655, -53.5))
            Line((30.3368556655, -53.5), (53, -53.5))
        make_face()
        with BuildLine():
            Line((17.75, -44.0218153502), (17.75, -15))
            ThreePointArc((17.75, -15), (17.1642135624, -13.5857864376), (15.75, -13))
            Line((15.75, -13), (-6.8007349005, -13))
            ThreePointArc((-6.8007349005, -13), (-8.5971597792, -14.120876769), (-8.3800137441, -16.2271423447))
            Line((-8.3800137441, -16.2271423447), (14.1707211564, -45.2489576949))
            ThreePointArc((14.1707211564, -45.2489576949), (16.3986302154, -45.9137135619), (17.75, -44.0218153502))
        make_face()
    extrude(amount=-F26_DEPTH, mode=Mode.SUBTRACT)


solid = f1.part
